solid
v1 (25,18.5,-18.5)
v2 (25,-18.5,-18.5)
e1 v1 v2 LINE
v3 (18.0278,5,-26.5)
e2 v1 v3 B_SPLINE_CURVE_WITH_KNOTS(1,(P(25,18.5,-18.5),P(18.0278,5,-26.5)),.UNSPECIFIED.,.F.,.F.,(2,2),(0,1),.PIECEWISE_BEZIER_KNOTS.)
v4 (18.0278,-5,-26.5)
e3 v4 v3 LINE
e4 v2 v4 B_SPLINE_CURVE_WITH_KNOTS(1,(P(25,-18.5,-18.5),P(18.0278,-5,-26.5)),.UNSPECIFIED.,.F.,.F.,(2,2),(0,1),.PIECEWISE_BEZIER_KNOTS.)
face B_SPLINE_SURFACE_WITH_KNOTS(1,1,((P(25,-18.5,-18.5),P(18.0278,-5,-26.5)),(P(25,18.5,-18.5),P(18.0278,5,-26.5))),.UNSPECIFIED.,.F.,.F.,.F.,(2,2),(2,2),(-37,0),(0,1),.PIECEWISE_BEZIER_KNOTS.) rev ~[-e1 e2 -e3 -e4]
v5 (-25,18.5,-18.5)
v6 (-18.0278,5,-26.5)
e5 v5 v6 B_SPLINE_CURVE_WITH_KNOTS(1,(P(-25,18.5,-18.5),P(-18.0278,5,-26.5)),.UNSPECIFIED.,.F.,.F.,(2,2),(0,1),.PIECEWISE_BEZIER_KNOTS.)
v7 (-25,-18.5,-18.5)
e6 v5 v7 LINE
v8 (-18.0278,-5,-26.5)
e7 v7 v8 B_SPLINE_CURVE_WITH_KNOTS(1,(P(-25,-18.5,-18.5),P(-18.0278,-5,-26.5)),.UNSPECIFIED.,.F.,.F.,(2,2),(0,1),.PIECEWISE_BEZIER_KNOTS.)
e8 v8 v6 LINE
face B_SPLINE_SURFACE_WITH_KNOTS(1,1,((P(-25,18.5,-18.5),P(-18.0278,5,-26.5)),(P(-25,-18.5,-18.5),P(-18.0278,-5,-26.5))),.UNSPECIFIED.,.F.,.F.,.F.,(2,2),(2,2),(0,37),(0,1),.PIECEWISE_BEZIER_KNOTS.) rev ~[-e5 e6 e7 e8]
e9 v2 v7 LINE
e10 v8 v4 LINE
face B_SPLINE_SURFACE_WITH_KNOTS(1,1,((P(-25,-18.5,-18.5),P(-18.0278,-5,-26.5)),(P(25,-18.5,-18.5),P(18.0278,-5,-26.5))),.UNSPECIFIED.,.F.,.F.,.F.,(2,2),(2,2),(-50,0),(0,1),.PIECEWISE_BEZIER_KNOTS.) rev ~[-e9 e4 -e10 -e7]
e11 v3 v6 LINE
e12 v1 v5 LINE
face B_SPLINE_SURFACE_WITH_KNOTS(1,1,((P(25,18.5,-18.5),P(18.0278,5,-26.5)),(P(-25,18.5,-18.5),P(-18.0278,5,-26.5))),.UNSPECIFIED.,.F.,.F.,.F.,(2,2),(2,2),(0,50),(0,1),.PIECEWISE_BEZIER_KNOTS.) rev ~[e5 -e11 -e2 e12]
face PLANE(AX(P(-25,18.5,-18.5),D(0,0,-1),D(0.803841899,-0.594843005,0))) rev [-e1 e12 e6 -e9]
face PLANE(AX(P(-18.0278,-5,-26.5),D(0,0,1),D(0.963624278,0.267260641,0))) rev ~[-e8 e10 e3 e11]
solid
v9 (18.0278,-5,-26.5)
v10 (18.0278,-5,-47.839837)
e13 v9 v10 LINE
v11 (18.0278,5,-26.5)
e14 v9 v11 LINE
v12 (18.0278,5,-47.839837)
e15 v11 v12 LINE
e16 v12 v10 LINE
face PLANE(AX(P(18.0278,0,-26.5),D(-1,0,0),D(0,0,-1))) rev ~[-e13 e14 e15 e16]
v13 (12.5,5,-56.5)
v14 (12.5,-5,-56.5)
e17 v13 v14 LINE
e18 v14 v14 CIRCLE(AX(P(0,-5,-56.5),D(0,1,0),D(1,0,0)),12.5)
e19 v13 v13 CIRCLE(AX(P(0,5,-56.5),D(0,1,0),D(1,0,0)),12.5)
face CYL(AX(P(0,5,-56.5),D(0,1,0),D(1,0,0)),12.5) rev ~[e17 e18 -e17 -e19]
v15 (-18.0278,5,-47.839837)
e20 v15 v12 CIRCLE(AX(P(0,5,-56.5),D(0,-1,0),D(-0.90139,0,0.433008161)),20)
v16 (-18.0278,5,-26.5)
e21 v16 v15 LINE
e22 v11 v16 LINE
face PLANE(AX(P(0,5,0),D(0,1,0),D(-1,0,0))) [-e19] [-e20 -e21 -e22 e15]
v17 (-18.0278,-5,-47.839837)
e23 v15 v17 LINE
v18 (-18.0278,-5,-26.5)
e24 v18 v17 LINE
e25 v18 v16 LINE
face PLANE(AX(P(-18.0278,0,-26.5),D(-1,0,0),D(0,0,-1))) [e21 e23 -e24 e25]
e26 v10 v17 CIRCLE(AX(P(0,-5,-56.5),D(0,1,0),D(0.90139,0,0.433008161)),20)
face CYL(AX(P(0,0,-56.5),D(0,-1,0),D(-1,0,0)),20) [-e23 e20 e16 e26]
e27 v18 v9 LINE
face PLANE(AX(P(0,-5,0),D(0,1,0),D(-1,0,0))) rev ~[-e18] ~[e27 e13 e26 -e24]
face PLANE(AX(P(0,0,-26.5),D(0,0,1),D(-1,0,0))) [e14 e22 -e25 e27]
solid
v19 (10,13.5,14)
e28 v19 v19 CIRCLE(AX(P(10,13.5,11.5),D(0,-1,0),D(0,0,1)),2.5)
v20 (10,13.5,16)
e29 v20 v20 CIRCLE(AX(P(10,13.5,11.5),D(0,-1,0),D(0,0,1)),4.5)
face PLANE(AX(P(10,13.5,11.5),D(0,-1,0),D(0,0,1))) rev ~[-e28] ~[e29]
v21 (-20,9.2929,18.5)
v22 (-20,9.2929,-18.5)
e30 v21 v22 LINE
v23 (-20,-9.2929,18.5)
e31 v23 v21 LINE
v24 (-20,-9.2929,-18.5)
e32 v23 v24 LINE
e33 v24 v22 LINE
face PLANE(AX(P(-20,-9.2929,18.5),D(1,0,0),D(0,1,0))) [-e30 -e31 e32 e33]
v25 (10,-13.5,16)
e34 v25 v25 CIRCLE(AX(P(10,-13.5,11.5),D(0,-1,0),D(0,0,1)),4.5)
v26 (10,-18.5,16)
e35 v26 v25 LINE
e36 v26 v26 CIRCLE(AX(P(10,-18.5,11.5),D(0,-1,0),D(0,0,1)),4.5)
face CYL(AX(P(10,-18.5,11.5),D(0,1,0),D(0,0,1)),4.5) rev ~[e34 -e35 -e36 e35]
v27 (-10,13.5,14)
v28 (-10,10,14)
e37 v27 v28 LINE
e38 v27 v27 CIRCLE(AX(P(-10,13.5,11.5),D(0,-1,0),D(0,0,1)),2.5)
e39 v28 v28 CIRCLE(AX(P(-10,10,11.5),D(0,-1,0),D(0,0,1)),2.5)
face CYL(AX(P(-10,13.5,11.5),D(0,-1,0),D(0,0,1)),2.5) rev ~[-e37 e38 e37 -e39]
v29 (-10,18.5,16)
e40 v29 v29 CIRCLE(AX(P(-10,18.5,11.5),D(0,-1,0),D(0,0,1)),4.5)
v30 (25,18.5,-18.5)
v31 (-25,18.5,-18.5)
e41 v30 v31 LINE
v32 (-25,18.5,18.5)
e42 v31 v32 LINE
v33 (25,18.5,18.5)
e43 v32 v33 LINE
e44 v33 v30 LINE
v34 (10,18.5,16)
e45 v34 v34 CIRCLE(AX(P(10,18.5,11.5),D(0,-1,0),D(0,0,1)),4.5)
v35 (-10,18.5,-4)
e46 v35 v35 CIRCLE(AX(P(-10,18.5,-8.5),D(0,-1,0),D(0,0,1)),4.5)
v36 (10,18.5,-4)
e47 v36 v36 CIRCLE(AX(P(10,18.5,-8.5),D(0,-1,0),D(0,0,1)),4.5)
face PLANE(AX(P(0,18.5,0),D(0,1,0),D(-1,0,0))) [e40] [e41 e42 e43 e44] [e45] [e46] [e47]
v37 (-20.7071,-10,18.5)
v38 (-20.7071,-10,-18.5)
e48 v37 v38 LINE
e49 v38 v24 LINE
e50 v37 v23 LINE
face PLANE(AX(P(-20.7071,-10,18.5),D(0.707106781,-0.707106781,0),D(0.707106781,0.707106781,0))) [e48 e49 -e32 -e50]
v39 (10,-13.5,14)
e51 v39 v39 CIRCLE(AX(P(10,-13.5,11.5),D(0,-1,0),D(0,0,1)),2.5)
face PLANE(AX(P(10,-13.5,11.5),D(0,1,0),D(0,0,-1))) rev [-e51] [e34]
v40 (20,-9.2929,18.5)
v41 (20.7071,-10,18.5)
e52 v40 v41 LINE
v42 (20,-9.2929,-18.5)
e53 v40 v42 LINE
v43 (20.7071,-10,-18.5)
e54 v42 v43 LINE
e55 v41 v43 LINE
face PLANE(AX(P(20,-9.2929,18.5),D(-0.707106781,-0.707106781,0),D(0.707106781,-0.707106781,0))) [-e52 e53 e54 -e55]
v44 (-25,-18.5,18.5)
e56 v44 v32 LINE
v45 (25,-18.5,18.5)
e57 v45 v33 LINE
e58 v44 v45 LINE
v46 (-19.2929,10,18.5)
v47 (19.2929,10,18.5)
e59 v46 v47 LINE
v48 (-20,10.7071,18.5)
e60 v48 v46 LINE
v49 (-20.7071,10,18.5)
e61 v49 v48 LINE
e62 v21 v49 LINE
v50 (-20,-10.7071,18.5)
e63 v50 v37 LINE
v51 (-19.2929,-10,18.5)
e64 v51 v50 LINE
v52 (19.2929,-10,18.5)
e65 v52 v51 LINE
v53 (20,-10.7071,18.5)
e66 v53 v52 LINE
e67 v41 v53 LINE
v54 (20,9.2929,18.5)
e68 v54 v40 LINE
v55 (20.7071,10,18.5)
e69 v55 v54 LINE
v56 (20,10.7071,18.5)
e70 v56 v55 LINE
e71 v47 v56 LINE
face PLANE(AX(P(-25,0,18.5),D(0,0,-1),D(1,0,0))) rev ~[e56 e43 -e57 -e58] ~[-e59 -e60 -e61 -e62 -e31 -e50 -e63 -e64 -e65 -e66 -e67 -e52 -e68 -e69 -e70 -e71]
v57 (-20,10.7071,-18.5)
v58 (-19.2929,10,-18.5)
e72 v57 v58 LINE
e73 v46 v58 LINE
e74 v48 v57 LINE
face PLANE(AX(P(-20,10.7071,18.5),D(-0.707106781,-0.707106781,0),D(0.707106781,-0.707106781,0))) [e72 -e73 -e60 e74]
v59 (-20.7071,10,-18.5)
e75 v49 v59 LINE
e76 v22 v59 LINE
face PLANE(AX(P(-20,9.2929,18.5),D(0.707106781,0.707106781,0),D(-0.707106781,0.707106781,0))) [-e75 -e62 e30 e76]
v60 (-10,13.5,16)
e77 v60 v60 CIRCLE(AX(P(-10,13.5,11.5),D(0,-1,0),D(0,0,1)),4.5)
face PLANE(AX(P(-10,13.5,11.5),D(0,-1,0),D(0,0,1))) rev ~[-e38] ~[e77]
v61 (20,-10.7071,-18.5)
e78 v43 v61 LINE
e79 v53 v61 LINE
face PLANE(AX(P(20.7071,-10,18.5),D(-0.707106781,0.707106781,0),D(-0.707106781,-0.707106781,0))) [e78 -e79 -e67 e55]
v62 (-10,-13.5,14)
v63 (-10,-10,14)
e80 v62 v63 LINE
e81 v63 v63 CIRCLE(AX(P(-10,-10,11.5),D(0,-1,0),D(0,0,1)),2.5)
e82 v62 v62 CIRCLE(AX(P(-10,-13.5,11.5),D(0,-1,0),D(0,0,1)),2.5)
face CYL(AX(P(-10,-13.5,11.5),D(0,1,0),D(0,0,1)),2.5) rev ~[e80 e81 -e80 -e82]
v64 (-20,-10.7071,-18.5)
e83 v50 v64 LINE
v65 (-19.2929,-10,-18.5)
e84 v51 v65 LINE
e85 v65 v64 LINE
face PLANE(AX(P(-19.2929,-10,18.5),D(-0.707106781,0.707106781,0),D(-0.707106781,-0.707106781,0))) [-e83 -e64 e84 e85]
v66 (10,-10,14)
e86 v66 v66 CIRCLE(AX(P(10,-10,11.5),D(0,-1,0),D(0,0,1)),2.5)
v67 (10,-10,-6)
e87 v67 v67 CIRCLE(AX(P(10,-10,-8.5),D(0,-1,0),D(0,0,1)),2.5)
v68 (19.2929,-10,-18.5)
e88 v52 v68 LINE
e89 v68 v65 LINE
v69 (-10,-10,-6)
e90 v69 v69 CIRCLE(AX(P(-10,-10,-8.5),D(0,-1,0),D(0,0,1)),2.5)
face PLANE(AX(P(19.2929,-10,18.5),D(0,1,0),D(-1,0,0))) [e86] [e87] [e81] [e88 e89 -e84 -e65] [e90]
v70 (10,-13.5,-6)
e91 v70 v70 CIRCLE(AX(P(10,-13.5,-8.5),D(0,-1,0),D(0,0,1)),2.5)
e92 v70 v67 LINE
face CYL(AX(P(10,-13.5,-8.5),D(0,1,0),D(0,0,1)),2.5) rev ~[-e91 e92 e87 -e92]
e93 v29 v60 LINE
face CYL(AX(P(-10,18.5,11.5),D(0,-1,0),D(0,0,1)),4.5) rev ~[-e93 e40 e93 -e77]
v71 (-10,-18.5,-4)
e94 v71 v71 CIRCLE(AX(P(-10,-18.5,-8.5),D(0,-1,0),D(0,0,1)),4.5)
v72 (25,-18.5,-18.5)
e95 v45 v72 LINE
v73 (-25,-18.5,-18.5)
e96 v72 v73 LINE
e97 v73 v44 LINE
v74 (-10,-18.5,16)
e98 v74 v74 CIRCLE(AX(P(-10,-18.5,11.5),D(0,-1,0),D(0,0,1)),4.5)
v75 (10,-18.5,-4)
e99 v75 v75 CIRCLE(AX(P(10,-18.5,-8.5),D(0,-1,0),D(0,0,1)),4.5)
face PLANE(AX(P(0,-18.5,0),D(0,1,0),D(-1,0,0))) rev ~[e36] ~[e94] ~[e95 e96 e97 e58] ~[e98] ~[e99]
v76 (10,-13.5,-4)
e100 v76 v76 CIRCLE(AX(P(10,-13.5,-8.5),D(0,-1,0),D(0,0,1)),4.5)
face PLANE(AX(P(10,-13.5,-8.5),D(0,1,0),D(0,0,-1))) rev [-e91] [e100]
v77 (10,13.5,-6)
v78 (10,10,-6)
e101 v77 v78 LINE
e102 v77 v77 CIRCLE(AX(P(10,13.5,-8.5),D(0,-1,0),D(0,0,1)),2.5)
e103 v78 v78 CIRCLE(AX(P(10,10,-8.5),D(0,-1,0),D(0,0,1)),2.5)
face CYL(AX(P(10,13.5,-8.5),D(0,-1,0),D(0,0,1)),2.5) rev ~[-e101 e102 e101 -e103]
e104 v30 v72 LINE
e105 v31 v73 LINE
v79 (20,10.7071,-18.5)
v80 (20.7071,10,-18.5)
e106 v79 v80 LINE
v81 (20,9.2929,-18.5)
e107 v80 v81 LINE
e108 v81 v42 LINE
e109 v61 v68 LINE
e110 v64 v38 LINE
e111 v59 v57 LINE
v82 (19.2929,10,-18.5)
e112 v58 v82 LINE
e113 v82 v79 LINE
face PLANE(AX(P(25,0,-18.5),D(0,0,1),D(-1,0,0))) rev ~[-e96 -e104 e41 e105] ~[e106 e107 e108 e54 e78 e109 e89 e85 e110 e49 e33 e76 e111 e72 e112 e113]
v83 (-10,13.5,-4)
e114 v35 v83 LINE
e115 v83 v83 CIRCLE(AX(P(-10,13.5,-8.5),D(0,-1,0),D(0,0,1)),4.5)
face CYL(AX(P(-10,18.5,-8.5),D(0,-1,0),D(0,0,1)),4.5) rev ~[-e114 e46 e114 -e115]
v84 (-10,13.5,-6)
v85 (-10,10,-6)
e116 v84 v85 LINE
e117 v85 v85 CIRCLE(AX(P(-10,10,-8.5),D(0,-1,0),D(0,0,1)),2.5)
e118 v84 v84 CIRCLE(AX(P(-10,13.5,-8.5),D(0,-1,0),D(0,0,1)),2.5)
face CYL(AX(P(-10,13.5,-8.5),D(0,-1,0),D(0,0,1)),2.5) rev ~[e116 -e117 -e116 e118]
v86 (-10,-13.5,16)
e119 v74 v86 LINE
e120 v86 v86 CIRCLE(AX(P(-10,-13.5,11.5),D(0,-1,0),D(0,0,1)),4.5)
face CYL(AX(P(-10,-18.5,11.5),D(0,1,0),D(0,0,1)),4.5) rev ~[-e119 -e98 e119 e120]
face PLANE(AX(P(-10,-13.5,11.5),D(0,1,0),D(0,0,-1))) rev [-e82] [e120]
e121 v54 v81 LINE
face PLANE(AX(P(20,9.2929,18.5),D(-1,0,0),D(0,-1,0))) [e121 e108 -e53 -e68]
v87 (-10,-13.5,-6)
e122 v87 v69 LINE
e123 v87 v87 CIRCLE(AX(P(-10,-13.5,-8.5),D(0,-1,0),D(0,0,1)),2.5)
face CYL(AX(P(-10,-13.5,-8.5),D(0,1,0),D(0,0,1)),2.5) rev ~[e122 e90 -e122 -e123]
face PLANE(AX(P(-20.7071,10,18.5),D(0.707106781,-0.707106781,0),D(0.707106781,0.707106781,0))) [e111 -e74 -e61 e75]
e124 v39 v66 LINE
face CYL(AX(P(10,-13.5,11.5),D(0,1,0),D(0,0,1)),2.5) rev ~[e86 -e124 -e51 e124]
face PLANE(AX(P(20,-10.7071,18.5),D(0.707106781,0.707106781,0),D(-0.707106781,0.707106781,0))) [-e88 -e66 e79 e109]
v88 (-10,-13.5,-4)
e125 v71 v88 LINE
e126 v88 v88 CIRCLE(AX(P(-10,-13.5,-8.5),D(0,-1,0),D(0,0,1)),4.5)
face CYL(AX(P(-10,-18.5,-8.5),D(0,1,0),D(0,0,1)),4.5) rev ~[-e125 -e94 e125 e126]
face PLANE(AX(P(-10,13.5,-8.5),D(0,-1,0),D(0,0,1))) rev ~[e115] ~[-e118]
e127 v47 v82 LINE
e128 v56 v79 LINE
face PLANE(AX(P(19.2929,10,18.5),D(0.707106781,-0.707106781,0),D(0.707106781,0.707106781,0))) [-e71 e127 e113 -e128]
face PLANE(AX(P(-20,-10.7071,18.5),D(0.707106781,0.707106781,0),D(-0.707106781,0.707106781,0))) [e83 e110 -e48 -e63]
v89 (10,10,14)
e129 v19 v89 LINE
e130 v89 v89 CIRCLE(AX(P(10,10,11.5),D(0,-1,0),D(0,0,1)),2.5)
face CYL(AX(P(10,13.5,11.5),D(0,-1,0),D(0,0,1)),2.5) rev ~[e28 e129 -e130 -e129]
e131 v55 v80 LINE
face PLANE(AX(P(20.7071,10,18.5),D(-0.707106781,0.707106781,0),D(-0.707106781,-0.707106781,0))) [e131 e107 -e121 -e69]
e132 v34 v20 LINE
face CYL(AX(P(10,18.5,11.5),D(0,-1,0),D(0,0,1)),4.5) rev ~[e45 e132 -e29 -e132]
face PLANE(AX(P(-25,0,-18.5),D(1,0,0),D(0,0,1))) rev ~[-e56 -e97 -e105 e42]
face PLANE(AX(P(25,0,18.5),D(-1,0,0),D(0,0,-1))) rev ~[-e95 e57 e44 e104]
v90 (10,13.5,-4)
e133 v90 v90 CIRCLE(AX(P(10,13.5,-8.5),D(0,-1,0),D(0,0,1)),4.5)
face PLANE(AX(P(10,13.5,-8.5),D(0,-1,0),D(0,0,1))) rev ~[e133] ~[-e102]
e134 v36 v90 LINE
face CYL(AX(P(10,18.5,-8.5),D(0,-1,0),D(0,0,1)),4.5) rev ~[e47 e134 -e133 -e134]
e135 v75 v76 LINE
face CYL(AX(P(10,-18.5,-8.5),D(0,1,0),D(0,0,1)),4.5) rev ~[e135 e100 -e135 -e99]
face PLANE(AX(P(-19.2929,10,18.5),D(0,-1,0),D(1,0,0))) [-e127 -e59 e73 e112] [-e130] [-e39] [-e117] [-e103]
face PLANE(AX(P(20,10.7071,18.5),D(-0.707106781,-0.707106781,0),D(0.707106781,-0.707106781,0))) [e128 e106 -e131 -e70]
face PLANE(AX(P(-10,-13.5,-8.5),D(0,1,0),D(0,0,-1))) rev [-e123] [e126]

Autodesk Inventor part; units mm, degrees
ref_plane "YZ Plane" through (0, 0, 0) normal (1, 0, 0) x (0, 1, 0)
ref_plane "XZ Plane" through (0, 0, 0) normal (0, 1, 0) x (-1, 0, 0)
ref_plane "XY Plane" through (0, 0, 0) normal (0, 0, 1) x (1, 0, 0)
sketch "Sketch1" plane through (0, 0, 0) normal (0, 1, 0) x (-1, 0, 0)
  line L0 (25, 18.5) -> (-25, 18.5)
  line L1 (-25, 18.5) -> (-25, -18.5)
  line L2 (-25, -18.5) -> (25, -18.5)
  line L3 (25, -18.5) -> (25, 18.5)
  line L4 (25, 18.5) -> (-25, -18.5) construction
  line L5 (-25, 18.5) -> (25, -18.5) construction
  point P0 (0, 0)
  dimension "d0" = 50
  dimension "d1" = 37
extrude "Extrusion1" add sketch "Sketch1" along normal mid plane 37
sketch "Sketch2" plane through (-25, 18.5, 18.5) normal (0, 0, 1) x (1, 0, 0)
  line L0 (5, -8.5) -> (45, -8.5)
  line L1 (45, -8.5) -> (45, -28.5)
  line L2 (45, -28.5) -> (5, -28.5)
  line L3 (5, -28.5) -> (5, -8.5)
  line L4 (5, -8.5) -> (45, -28.5) construction
  line L5 (45, -8.5) -> (5, -28.5) construction
  line L6 (5, -7.7929) -> (5.7071, -8.5)
  line L7 (5.7071, -8.5) -> (5, -9.2071)
  line L8 (5, -9.2071) -> (4.2929, -8.5)
  line L9 (4.2929, -8.5) -> (5, -7.7929)
  line L10 (4.5, -8) -> (5.5, -9) construction
  line L11 (5.5, -8) -> (4.5, -9) construction
  line L12 (45, -7.7929) -> (45.7071, -8.5)
  line L13 (45.7071, -8.5) -> (45, -9.2071)
  line L14 (45, -9.2071) -> (44.2929, -8.5)
  line L15 (44.2929, -8.5) -> (45, -7.7929)
  line L16 (45, -27.7929) -> (45.7071, -28.5)
  line L17 (45.7071, -28.5) -> (45, -29.2071)
  line L18 (45, -29.2071) -> (44.2929, -28.5)
  line L19 (44.2929, -28.5) -> (45, -27.7929)
  line L20 (5, -27.7929) -> (5.7071, -28.5)
  line L21 (5.7071, -28.5) -> (5, -29.2071)
  line L22 (5, -29.2071) -> (4.2929, -28.5)
  line L23 (4.2929, -28.5) -> (5, -27.7929)
  point P0 (25, -18.5)
  point P1 (5, -9.2071)
  point P2 (5, -27.7929)
  point P3 (5.7071, -28.5)
  point P4 (5.7071, -8.5)
  dimension "d4" = 40
  dimension "d5" = 20
  dimension "d6" = 1
  dimension "d7" = 1
  dimension "d8" = 1
  dimension "d9" = 1
  dimension "d10" = 1
  dimension "d11" = 1
  dimension "d12" = 1
  dimension "d13" = 1
extrude "Extrusion2" cut sketch "Sketch2" against normal blind 37
sketch "Sketch3" plane through (0, 18.5, 0) normal (0, 1, 0) x (1, 0, 0)
  line L0 (25, -18.5) -> (-25, -18.5) construction
  line L1 (0, -18.5) -> (0, -1.5) construction
  line L2 (-10, 8.5) -> (10, 8.5) construction
  line L3 (10, 8.5) -> (10, -11.5) construction
  line L4 (10, -11.5) -> (-10, -11.5) construction
  line L5 (-10, -11.5) -> (-10, 8.5) construction
  line L6 (-10, 8.5) -> (10, -11.5) construction
  line L7 (10, 8.5) -> (-10, -11.5) construction
  point P0 (0, 0)
  dimension "d16" = 17
  dimension "d17" = 20
  dimension "d18" = 20
hole "Hole1" at (-10, 18.5, 11.5) at (-10, 18.5, -8.5) at (10, 18.5, -8.5) at (10, 18.5, 11.5) direction (0, -1, 0) diameter 5 depth 8.5 counterbore diameter 9 counterbore depth 5
mirror "Mirror1" about plane through (0, 0, 0) normal (0, 1, 0) of "Hole1"
sketch "Sketch4" plane through (0, 0, 0) normal (0, 1, 0) x (-1, 0, 0)
  line L0 (19.2929, -18.5) -> (-19.2929, -18.5) projected
  line L1 (0, -18.5) -> (0, -56.5) construction
  line L2 (-25, -18.5) -> (25, -18.5) projected
  line L3 (25, 18.5) -> (25, -18.5) construction
  line L4 (0, -94.5) -> (0, -18.5) construction
  circle A0 centre (0, -56.5) radius 35
  line L5 (0, -21.5) -> (0, -26.5)
  line L6 (0, -26.5) -> (-18.0278, -26.5)
  line L7 (0, -26.5) -> (18.0278, -26.5)
  line L8 (-18.0278, -26.5) -> (-18.0278, -86.5)
  line L9 (18.0278, -26.5) -> (18.0278, -86.5)
  circle A1 centre (0, -56.5) radius 20
  point P0 (0, 0)
  point P1 (18.0278, -47.8397)
  point P2 (-18.0278, -47.8397)
  point P3 (-18.0278, -65.1603)
  point P4 (18.0278, -65.1603)
  dimension "d26" = 38
  dimension "d35" = 70
  dimension "d36" = 5
  dimension "d46" = 40
extrude "Extrusion5" add sketch "Sketch4" along normal mid plane 10 contours L9 A1 L8 L6 L7 | A1 L9 | L9 A1 L8 | L8 A1
loft "Loft1" add separate body section 1 edges at (-25, 0, -18.5) (0, 18.5, -18.5) (25, 0, -18.5) (0, -18.5, -18.5) section 2 edges at (18.0278, 0, -26.5) (0, 5, -26.5) (-18.0278, 0, -26.5) (0, -5, -26.5)
sketch "Sketch6" plane through (0, 5, 0) normal (0, 1, 0) x (1, 0, 0)
  arc A0 (18.0278, 26.5) -> (-18.0278, 26.5) centre (0, 56.5) ccw projected
  circle A1 centre (0, 56.5) radius 12.5
  point P0 (0, 0)
  dimension "d43" = 25
extrude "Extrusion6" cut sketch "Sketch6" against normal blind 10 bodies 1
properties part number "EndEffectorJoint" material "ABS Plastic"
